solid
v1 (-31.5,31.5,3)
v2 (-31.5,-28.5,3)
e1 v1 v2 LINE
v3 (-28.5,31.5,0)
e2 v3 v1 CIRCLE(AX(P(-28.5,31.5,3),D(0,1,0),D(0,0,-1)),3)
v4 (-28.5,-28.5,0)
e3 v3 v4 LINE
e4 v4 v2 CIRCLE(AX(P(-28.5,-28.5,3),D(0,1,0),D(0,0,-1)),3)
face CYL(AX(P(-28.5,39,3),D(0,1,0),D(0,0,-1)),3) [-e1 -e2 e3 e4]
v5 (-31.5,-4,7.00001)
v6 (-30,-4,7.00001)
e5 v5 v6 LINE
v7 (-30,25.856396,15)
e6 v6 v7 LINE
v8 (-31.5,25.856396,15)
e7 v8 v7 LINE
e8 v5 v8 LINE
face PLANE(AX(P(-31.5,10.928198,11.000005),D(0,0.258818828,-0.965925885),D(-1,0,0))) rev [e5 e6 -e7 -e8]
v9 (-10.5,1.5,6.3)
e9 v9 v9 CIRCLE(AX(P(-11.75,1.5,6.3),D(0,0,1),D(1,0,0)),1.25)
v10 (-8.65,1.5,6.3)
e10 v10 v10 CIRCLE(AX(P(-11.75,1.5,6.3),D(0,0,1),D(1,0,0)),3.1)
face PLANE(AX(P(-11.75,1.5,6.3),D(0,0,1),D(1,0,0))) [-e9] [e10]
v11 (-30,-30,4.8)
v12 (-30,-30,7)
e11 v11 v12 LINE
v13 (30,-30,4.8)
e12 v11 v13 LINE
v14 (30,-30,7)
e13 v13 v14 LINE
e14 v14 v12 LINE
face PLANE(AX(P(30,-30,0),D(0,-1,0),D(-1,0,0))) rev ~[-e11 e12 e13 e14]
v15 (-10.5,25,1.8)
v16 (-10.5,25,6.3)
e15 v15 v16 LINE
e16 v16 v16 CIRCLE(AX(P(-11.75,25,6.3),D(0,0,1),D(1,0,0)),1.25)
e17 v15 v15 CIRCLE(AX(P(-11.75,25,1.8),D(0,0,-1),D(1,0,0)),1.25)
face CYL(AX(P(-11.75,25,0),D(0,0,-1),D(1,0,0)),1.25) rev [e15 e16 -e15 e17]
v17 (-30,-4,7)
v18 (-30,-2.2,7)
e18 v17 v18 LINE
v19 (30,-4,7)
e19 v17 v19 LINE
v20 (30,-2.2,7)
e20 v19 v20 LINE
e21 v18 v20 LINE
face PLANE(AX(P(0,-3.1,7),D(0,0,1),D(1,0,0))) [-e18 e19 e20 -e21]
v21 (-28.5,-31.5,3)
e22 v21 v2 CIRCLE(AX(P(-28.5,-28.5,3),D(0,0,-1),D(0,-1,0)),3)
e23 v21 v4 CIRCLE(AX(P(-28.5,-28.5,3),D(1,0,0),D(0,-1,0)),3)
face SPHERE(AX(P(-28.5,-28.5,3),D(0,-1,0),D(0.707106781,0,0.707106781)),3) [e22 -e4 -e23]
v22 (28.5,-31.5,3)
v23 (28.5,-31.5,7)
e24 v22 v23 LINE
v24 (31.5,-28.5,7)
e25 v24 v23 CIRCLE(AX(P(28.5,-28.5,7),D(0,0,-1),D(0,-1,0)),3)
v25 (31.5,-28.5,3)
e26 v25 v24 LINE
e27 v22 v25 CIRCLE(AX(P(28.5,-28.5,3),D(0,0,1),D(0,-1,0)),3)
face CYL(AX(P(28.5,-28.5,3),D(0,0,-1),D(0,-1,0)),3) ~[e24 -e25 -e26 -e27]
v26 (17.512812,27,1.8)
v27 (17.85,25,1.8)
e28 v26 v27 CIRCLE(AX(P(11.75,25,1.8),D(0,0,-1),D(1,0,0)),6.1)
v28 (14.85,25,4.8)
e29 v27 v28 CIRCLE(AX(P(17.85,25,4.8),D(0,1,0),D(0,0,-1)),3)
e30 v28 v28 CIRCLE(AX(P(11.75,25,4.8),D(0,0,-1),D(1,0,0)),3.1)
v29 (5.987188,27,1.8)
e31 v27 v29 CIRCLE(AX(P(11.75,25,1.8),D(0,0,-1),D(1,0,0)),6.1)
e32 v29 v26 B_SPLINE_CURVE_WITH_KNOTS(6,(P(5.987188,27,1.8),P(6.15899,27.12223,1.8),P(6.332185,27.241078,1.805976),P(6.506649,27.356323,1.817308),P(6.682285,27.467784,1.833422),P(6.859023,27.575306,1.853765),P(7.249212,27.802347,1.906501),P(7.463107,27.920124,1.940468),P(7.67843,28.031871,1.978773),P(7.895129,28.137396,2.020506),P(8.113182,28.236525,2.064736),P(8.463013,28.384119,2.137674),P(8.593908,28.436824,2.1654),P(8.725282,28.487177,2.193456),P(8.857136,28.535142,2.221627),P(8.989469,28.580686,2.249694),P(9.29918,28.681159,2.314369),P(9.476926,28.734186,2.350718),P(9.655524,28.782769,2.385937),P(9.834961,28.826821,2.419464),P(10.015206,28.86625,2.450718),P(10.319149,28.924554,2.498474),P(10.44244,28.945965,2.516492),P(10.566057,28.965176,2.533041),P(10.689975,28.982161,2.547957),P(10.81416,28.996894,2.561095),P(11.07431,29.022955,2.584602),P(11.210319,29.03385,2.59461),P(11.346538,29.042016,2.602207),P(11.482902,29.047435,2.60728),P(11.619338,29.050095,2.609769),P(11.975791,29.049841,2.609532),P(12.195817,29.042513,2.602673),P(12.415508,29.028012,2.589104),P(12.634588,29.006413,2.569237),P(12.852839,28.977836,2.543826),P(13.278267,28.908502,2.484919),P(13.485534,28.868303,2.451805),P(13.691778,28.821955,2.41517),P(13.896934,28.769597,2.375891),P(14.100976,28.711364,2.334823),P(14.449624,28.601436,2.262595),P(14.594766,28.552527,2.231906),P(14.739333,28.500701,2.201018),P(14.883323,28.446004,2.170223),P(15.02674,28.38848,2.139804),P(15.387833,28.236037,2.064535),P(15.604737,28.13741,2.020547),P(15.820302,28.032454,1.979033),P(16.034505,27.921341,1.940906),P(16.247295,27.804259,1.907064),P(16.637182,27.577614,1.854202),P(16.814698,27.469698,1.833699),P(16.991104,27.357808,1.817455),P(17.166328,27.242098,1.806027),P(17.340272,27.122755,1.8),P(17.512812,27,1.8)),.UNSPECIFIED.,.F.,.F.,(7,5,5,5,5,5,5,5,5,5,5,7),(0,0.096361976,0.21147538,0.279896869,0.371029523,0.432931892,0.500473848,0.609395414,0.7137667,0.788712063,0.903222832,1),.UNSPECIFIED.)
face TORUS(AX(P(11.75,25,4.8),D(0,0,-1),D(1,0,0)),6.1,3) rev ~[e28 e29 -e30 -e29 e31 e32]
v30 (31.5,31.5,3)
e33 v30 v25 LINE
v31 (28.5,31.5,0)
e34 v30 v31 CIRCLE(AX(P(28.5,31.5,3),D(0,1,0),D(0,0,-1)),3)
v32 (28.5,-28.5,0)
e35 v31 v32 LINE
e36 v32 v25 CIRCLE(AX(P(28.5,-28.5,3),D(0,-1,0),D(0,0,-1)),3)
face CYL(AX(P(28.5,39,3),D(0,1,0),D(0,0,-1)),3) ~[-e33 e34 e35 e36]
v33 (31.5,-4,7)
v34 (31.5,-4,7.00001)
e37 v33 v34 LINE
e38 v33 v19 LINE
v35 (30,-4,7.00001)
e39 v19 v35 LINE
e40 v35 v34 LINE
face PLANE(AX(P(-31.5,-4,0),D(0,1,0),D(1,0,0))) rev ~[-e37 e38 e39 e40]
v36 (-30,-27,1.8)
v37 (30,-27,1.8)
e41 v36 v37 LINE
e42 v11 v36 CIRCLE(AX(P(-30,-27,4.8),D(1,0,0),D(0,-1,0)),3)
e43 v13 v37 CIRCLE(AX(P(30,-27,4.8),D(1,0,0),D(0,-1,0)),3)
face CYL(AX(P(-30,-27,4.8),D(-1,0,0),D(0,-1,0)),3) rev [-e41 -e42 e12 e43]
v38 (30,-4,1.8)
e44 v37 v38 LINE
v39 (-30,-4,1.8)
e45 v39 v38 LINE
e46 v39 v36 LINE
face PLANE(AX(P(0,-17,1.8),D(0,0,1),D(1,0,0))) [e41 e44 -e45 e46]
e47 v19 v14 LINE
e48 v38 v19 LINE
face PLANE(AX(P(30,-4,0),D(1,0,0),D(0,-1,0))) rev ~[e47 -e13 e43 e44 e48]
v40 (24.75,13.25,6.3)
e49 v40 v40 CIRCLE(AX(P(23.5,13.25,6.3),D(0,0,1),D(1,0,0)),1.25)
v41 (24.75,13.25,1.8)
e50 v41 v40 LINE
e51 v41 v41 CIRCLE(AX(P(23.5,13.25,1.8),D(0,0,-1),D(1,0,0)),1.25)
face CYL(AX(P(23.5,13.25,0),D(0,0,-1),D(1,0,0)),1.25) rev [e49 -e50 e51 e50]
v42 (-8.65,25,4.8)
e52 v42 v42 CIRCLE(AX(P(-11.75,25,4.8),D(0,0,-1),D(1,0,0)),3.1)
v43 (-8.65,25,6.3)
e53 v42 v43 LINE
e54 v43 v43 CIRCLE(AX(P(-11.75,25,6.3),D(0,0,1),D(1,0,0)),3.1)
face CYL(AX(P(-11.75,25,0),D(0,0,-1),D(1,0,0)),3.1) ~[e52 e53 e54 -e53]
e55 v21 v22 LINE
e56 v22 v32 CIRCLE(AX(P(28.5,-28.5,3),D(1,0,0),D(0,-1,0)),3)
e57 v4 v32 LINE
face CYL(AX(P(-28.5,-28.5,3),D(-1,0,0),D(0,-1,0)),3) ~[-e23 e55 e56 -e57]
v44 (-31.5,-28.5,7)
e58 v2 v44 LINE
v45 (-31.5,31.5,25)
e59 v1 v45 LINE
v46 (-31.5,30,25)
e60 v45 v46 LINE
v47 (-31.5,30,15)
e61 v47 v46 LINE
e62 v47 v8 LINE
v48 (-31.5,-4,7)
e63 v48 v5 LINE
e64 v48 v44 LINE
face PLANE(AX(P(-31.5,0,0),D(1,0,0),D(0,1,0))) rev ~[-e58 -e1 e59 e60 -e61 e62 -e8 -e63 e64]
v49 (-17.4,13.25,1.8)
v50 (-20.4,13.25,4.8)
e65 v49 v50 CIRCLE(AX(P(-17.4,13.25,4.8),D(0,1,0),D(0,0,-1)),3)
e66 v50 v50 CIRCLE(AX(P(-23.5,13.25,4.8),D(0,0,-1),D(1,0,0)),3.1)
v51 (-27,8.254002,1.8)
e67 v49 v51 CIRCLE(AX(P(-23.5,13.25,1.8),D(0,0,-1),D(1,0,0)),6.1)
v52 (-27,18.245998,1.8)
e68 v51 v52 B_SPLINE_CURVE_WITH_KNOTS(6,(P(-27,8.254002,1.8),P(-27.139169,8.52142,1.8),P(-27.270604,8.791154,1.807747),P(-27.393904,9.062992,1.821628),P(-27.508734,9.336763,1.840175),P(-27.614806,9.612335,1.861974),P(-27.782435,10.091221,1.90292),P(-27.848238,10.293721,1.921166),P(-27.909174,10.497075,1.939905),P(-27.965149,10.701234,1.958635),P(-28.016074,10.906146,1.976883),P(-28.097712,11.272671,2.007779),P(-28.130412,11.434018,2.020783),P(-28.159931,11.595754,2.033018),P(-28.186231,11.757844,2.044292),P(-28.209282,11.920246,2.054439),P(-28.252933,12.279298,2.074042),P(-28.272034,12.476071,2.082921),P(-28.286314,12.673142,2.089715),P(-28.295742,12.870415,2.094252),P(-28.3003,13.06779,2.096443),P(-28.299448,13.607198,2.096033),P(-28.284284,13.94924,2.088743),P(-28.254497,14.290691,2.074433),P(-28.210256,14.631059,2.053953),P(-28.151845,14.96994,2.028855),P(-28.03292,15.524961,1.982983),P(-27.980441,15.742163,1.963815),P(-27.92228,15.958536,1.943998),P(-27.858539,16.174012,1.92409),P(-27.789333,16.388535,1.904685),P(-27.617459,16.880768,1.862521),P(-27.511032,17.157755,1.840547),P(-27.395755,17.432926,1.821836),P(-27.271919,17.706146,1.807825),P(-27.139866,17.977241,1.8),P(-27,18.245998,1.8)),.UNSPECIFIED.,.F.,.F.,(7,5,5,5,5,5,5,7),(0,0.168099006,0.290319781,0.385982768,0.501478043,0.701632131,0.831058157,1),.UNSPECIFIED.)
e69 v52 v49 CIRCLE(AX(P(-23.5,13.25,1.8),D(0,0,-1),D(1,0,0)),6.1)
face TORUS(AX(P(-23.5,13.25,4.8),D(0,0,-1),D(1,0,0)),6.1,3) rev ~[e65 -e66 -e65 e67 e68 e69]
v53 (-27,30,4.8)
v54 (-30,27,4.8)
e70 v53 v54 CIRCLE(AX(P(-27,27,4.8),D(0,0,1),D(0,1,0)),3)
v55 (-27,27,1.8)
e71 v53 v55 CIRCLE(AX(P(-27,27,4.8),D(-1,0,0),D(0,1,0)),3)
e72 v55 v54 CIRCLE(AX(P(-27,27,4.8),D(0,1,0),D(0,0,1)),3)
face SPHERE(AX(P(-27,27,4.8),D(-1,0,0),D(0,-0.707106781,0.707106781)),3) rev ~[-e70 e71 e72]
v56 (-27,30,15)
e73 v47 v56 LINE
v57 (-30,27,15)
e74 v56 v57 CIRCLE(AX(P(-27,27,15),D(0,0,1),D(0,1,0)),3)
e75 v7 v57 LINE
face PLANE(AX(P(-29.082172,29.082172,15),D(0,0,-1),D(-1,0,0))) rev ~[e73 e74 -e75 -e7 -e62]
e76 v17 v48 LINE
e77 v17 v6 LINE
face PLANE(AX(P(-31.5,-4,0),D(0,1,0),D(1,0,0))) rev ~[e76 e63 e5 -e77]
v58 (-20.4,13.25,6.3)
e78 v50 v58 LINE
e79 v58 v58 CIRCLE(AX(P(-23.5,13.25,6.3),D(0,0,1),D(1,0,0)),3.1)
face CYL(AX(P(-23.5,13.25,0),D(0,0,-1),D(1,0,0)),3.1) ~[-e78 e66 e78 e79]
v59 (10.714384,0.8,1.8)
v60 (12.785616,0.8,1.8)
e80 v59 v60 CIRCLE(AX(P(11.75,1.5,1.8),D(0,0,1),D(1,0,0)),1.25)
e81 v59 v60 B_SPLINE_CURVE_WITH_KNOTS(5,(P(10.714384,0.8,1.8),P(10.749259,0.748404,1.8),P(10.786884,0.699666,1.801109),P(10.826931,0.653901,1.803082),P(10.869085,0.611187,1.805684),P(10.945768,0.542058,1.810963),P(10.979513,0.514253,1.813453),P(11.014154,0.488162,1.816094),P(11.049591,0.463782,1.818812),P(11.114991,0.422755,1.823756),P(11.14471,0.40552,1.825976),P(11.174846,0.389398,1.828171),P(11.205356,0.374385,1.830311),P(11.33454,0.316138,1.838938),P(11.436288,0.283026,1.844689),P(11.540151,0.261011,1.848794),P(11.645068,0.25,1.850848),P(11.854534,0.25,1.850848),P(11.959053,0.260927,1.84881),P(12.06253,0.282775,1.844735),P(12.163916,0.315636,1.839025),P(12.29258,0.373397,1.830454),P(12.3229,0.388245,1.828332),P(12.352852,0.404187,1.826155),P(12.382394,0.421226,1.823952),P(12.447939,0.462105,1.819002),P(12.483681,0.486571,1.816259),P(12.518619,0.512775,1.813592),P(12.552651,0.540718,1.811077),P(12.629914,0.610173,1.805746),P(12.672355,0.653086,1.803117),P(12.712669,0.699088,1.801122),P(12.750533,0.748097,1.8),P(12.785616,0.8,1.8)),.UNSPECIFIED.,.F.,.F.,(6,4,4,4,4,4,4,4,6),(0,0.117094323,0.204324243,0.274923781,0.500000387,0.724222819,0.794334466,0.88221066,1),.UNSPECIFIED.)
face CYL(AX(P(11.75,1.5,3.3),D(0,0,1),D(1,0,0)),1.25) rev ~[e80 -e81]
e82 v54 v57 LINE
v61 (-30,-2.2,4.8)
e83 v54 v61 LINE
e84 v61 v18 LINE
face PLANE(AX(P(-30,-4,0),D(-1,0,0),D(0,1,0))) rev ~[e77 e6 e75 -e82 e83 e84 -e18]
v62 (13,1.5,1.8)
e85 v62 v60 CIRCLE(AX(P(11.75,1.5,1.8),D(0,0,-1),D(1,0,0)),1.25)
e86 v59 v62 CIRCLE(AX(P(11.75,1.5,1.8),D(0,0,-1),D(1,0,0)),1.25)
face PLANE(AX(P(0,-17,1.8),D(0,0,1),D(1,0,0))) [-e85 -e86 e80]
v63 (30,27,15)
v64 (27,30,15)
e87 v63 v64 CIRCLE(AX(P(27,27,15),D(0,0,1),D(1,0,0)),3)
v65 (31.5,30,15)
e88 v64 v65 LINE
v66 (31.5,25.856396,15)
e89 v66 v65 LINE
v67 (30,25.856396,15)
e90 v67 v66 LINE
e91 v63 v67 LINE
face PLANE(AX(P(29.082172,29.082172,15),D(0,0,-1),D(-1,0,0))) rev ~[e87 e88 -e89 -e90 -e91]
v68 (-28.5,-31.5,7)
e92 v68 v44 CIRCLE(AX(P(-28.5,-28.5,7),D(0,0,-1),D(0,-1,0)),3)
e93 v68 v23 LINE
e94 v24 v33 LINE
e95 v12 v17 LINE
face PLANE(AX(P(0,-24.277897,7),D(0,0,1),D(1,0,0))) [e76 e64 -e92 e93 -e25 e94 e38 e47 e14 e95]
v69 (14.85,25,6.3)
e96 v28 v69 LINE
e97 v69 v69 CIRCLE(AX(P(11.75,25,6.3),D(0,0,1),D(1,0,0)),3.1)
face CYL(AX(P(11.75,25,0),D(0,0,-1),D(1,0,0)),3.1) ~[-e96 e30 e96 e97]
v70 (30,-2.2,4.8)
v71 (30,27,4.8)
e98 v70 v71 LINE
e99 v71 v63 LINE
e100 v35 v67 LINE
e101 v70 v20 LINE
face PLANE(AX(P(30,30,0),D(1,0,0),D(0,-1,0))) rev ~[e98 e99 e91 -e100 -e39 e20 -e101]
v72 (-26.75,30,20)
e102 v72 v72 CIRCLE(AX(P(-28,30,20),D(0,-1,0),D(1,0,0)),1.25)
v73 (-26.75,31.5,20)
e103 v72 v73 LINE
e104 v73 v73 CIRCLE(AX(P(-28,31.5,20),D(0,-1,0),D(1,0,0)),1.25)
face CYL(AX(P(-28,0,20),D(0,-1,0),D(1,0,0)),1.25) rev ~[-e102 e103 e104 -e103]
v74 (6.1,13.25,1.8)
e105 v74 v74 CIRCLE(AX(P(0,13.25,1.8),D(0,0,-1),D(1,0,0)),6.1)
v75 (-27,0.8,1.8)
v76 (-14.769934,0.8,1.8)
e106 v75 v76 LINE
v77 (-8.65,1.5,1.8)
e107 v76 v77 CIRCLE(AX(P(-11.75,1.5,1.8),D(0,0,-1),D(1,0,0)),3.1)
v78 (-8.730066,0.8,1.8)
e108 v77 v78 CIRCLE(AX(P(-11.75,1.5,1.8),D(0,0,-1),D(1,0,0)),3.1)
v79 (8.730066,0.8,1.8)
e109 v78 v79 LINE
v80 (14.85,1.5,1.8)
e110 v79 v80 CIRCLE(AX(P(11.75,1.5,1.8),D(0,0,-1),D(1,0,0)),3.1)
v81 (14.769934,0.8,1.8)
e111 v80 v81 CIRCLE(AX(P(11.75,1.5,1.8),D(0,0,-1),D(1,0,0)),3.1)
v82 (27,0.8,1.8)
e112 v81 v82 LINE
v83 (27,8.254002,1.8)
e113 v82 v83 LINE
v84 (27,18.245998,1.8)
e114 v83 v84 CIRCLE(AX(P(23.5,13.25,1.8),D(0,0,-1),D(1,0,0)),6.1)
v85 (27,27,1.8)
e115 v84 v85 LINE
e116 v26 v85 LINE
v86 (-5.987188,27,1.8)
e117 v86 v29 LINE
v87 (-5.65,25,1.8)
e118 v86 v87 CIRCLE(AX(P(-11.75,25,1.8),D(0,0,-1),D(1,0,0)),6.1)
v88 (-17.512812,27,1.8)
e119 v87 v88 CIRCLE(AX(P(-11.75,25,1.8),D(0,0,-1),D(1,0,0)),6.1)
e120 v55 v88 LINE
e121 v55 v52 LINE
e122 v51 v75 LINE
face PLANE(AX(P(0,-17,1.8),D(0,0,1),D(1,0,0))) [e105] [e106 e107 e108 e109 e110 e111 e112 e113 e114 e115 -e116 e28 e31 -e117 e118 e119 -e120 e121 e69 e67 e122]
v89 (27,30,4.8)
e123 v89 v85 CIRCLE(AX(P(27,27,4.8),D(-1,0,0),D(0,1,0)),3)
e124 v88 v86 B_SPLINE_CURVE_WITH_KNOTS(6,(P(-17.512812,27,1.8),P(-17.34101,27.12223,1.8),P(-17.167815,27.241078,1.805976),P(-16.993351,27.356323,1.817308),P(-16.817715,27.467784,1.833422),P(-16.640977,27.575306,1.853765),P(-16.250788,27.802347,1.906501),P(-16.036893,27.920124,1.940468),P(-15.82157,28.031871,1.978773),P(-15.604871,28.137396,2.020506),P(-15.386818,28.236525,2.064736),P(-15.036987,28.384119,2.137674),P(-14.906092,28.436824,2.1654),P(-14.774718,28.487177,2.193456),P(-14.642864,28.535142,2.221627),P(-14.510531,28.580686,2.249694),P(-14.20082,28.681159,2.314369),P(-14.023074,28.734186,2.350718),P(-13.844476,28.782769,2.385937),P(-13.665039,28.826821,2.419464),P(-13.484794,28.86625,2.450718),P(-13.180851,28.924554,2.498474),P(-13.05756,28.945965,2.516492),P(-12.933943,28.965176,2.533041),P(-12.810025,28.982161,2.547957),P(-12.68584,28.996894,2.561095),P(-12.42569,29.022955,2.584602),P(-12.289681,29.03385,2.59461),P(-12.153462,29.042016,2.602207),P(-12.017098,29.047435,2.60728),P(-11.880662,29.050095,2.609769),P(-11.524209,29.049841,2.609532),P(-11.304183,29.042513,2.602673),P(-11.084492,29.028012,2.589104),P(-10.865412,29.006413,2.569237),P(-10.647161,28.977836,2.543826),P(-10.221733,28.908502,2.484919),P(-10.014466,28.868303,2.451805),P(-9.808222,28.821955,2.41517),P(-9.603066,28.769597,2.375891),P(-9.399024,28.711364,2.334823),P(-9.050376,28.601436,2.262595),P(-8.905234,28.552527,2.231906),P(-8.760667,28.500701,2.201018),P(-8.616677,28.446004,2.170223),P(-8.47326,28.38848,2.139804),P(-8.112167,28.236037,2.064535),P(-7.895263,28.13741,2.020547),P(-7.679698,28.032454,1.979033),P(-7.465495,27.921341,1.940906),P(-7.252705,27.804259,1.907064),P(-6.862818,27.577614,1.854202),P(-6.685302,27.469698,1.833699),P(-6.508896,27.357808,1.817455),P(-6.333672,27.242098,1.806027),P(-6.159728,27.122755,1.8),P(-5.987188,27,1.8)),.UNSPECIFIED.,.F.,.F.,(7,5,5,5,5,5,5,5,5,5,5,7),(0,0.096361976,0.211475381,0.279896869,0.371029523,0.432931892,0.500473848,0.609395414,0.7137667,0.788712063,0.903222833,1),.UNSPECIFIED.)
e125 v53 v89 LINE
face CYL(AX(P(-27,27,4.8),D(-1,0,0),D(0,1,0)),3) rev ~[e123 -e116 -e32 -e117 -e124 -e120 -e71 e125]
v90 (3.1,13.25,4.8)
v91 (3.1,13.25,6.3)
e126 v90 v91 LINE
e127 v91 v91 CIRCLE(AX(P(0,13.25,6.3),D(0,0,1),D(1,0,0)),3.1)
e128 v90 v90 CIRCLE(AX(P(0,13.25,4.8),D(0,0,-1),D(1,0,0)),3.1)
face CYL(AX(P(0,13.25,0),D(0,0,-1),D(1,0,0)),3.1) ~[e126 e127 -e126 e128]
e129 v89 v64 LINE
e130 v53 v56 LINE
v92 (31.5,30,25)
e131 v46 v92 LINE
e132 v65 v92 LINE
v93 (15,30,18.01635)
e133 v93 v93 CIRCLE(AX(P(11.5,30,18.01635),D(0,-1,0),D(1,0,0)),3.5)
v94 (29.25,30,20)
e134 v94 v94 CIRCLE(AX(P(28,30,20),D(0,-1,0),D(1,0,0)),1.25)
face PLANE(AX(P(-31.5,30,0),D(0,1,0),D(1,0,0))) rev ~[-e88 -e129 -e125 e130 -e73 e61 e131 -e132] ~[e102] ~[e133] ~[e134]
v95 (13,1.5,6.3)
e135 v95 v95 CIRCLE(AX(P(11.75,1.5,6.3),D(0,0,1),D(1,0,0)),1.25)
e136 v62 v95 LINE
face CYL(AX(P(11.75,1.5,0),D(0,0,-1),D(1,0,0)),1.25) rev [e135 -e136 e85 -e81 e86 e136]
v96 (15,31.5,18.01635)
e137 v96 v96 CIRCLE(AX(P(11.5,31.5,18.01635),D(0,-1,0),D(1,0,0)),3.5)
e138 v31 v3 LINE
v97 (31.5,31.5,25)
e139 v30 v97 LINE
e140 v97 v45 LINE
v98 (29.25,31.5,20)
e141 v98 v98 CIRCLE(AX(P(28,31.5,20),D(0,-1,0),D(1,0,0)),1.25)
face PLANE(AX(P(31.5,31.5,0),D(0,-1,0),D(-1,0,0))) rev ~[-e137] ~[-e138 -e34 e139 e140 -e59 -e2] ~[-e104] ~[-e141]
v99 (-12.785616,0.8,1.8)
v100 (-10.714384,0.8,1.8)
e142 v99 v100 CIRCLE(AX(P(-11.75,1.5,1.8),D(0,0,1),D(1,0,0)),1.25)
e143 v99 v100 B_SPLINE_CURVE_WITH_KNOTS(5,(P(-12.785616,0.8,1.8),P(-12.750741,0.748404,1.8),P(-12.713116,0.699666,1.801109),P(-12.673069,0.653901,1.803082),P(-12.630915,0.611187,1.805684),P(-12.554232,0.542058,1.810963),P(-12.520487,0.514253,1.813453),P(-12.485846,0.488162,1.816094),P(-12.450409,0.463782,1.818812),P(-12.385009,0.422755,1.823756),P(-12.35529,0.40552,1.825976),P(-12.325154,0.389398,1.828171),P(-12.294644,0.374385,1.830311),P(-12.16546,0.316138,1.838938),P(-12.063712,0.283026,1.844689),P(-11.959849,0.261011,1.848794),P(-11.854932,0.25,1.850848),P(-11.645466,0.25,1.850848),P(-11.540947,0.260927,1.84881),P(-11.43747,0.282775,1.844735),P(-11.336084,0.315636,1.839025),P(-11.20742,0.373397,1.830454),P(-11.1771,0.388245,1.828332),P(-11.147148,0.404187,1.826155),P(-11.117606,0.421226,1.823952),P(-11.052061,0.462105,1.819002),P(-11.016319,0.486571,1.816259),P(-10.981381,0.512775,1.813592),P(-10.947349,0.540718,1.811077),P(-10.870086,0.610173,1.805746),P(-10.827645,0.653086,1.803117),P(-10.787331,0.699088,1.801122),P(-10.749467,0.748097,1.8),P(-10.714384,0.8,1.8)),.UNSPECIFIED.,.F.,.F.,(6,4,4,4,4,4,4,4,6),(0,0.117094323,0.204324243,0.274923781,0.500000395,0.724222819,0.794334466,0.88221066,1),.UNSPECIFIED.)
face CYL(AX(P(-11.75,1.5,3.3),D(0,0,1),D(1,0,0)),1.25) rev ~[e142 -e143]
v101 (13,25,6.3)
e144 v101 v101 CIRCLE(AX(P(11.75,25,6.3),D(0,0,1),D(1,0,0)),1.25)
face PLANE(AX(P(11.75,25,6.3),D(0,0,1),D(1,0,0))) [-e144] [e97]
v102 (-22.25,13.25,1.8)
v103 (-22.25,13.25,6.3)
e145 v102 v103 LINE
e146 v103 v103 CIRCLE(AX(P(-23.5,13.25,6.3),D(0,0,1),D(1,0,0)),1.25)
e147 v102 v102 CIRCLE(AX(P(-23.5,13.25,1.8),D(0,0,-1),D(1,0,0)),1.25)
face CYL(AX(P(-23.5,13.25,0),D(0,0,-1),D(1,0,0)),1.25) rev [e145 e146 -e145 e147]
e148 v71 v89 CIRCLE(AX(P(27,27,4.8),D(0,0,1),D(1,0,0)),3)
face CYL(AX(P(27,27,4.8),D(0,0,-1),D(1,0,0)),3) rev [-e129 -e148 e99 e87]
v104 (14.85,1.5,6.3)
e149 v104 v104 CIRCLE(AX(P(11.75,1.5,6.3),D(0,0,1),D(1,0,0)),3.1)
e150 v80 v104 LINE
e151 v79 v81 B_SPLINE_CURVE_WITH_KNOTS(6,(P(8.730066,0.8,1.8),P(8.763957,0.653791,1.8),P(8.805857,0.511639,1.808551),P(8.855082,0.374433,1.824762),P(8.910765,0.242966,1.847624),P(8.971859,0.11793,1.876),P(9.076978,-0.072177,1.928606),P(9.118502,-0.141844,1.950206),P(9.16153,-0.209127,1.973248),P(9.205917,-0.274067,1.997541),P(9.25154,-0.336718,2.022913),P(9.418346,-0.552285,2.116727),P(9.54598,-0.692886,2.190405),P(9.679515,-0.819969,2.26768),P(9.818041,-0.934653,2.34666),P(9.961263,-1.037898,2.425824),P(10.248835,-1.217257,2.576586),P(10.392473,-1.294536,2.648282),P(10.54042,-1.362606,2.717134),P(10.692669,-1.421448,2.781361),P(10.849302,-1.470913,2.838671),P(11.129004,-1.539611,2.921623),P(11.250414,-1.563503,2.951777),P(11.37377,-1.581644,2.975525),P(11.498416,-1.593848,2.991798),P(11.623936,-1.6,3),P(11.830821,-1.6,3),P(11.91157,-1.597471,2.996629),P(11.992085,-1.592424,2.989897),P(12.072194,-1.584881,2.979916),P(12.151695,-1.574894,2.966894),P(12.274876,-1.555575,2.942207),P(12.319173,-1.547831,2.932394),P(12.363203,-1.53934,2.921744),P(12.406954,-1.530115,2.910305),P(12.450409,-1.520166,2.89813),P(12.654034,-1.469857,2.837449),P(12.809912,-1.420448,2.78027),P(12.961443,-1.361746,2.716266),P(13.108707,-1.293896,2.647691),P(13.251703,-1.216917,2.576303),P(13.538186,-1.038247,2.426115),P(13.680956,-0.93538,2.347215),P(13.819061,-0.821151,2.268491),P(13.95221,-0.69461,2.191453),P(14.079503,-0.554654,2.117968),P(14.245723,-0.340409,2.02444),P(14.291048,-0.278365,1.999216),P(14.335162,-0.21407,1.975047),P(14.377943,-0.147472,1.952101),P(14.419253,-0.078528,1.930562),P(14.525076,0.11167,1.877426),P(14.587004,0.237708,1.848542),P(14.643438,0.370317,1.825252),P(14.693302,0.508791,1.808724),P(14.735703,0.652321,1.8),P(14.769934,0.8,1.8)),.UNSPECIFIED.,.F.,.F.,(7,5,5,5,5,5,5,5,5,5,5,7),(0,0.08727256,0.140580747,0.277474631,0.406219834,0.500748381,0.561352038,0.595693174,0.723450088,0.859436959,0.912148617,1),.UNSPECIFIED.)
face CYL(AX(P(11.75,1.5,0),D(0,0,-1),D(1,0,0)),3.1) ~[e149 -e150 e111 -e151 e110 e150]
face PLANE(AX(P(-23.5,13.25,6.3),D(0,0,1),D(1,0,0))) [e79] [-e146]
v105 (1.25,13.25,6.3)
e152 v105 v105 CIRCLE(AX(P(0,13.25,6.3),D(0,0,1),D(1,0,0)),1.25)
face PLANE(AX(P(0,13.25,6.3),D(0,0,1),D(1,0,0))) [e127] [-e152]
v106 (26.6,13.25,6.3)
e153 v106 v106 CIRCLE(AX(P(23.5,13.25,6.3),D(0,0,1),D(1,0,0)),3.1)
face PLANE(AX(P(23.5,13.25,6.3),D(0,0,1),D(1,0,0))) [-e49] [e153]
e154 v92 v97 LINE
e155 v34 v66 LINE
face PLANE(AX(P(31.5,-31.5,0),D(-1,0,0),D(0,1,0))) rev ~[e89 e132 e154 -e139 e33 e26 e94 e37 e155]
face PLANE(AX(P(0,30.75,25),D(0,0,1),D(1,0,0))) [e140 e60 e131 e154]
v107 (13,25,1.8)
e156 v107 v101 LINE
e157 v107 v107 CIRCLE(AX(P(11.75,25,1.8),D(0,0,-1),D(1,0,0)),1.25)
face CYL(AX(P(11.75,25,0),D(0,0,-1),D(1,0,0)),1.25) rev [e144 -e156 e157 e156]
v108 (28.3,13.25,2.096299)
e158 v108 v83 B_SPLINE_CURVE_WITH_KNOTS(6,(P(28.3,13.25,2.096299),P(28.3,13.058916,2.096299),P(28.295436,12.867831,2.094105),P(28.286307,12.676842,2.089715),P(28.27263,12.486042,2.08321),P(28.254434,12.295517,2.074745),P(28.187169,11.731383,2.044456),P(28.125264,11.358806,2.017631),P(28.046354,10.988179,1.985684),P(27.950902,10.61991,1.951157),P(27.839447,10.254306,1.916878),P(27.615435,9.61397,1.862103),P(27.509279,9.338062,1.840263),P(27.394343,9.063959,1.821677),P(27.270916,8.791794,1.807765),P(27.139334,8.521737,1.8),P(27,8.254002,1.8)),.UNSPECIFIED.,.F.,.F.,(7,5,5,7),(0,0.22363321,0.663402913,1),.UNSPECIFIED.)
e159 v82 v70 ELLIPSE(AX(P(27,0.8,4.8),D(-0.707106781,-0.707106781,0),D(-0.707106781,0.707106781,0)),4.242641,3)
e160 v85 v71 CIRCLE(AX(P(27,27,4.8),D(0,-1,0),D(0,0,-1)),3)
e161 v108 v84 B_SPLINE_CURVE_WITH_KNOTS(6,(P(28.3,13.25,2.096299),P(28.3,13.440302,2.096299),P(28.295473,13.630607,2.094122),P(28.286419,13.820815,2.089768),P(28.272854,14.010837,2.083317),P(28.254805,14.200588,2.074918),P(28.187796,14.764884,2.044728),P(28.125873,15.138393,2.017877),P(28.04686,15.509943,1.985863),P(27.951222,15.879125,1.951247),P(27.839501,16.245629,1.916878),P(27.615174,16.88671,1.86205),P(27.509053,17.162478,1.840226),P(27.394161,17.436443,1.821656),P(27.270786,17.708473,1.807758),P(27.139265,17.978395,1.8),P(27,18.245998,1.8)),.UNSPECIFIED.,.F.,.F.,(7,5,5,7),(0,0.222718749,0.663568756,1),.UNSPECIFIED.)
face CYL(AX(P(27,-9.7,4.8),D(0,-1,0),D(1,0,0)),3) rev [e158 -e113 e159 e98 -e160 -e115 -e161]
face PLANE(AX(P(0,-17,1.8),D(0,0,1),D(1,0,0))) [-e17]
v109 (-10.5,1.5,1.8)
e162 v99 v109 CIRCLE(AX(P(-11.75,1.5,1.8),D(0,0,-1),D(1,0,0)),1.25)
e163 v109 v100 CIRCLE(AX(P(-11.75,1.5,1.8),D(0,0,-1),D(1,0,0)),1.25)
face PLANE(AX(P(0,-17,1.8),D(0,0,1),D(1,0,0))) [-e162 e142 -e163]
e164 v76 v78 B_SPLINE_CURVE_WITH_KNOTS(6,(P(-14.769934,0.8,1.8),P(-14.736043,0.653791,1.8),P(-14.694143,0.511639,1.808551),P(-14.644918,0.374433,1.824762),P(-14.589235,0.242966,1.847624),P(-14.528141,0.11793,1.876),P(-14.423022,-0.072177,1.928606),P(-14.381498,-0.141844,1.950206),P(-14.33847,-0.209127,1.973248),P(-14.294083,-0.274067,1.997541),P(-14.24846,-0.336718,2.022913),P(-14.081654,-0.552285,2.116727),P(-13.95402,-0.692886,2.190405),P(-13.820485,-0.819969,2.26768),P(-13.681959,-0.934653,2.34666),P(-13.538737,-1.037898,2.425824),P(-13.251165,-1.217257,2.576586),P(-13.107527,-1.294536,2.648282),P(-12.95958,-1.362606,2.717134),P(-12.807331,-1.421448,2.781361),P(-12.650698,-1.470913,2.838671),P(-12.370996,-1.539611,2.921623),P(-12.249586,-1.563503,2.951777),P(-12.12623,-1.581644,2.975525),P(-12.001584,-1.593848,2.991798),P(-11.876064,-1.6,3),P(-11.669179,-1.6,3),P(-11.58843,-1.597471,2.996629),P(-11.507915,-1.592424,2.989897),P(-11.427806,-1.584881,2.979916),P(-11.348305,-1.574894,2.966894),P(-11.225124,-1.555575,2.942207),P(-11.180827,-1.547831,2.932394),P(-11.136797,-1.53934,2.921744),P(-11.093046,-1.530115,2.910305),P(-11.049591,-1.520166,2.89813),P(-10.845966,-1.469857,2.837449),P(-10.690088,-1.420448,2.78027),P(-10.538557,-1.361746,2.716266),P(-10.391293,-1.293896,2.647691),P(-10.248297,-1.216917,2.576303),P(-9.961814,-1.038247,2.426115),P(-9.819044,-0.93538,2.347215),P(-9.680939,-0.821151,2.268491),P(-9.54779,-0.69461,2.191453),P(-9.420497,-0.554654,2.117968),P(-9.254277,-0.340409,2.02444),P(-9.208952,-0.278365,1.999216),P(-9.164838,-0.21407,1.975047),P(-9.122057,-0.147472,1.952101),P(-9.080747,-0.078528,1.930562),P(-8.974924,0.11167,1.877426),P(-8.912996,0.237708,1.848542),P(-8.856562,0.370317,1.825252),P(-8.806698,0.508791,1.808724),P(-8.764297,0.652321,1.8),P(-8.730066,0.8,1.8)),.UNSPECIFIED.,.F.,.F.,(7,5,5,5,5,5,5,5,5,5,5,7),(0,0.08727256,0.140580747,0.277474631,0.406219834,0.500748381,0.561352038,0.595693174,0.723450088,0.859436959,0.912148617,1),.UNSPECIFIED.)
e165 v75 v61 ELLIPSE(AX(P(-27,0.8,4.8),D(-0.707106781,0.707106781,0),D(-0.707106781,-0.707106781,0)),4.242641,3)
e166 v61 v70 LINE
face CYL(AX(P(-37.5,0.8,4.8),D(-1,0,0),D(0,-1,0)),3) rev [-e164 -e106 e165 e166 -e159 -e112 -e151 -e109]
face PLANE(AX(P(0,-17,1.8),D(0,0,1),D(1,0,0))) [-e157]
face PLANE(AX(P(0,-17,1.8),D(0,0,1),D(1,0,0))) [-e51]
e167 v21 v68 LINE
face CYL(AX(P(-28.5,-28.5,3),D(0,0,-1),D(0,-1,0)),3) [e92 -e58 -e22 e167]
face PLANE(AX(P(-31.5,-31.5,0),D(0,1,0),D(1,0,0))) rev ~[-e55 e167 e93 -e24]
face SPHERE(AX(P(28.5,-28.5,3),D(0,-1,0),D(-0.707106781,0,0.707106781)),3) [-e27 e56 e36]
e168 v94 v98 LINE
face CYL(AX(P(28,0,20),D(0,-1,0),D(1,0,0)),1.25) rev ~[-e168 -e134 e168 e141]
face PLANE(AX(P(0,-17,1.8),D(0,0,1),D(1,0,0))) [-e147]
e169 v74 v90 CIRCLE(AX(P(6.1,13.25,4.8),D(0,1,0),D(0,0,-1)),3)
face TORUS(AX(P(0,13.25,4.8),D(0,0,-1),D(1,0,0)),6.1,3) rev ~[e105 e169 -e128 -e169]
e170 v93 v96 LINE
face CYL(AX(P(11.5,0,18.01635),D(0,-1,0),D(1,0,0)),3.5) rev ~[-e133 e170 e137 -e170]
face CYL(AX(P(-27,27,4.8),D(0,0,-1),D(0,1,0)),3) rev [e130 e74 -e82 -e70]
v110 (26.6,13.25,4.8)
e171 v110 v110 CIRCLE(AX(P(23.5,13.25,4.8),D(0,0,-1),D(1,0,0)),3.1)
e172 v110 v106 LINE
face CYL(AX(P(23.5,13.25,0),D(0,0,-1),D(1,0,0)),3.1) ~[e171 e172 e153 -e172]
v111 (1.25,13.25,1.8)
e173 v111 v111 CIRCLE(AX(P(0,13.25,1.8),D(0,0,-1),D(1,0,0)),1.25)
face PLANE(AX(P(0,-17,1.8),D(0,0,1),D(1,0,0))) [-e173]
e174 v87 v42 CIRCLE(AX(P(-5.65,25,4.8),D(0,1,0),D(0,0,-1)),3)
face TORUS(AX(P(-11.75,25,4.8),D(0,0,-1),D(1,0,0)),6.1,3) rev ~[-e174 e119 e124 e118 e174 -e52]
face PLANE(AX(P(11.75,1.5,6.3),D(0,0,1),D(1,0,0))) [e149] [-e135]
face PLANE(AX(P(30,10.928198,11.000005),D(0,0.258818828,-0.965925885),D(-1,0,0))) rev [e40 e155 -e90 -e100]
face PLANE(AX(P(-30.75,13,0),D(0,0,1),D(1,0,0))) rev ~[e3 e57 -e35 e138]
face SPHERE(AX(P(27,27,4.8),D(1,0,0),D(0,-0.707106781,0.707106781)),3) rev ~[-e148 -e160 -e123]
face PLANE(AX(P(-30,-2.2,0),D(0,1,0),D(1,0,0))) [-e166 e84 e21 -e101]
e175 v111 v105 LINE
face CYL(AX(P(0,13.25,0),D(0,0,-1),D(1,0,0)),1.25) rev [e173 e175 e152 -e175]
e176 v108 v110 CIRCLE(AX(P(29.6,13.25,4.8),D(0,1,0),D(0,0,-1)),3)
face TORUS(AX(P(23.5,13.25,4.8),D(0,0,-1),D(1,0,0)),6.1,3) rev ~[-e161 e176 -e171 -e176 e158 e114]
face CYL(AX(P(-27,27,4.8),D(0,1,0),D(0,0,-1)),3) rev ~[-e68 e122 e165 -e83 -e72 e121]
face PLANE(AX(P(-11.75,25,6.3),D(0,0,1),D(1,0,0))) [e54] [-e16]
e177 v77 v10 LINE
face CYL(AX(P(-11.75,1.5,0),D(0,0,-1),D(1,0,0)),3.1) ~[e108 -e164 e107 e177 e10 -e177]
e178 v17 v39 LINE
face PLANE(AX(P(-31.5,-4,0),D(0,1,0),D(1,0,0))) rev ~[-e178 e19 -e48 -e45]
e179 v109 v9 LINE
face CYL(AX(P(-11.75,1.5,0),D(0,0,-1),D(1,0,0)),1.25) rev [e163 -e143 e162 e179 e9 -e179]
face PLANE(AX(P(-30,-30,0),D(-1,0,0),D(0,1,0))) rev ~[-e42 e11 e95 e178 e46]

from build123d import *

# Parameters (mm, degrees)
F1_DEPTH      = 25
F0_W          = 60
F0_H          = 26
F0_H_2        = 32.2
F0_H_3        = 1.8
F2_DEPTH      = 1.8
F3_DEPTH      = 7
F4_R          = 3.1
F4_R_2        = 1.25
F5_DEPTH      = 6.3
F6_DEPTH      = 15
F7_DEPTH      = 7
F8_SIZE2      = 29.856396
F8_SIZE       = 7.99999
F9_SIZE2      = 29.856396
F9_SIZE       = 7.99999
F10_R         = 1.25
F10_R_2       = 3.5
F11_DEPTH     = 31.501
F12_T1_DEPTH  = 54
F12_T3_DEPTH  = 60
F12_T5_DEPTH  = 10.2
F12_S9_W      = 3.06
F12_S9_H      = 3.06
F12_T10_DEPTH = 3.06
F12_S15_W     = 3.06
F12_S15_H     = 3.06
F12_T16_DEPTH = 3.06
F12_T32_DEPTH = 75
F12_S35_R     = 1.25
F12_T36_DEPTH = 39
F12_S37_R     = 1.25
F12_T38_DEPTH = 39
F12_T42_DEPTH = 36.7
F12_T47_DEPTH = 36.7
F12_T49_DEPTH = 11.5
F12_T51_DEPTH = 57
F12_T53_DEPTH = 67.5
F12_S57_W     = 3.06
F12_S57_H     = 3.06
F12_T58_DEPTH = 3.06
F12_S63_W     = 3.06
F12_S63_H     = 3.06
F12_T64_DEPTH = 3.06


# Not quite as in the source:
# - a fillet or chamfer that OpenCascade refuses, or shapes differently, is made with other operations: its cross-section is extruded or revolved along the edge and cut away or added
# - a fillet or chamfer is up to 0.001 mm smaller than in the source, because OpenCascade refuses the exact size


with BuildPart() as f1:
    # F0 (on Top) → F1 (new body)
    with BuildSketch(Plane.XY):
        Polygon((-30, 30), (30, 30), (31.5, 30), (31.5, 31.5), (0, 31.5), (-31.5, 31.5), (-31.5, 30), align=None)
    extrude(amount=F1_DEPTH)

    # F0 (on Top) → F2 (join)
    with BuildSketch(Plane.XY):
        with Locations((0, -17)):
            Rectangle(F0_W, F0_H)
        Polygon((30, -4), (30, -30), (-30, -30), (-30, -4), (-31.5, -4), (-31.5, -5), (-31.5, -31.5), (-4.0078373849, -31.5), (31.5, -31.5), (31.5, -4), align=None)
        with Locations((0, 13.9)):
            Rectangle(F0_W, F0_H_2)
        with Locations((0, -3.1)):
            Rectangle(F0_W, F0_H_3)
    extrude(amount=F2_DEPTH)

    # F0 (on Top) → F3 (join)
    with BuildSketch(Plane.XY):
        with Locations((0, -3.1)):
            Rectangle(F0_W, F0_H_3)
    extrude(amount=F3_DEPTH)

    # F4 (on Top) → F5 (join)
    with BuildSketch(Plane.XY):
        with Locations((23.5, 13.25)):
            Circle(F4_R)
        with Locations((23.5, 13.25)):
            Circle(F4_R_2, mode=Mode.SUBTRACT)
        with Locations((11.75, 1.5)):
            Circle(F4_R)
        with Locations((11.75, 1.5)):
            Circle(F4_R_2, mode=Mode.SUBTRACT)
        with Locations((11.75, 25)):
            Circle(F4_R)
        with Locations((11.75, 25)):
            Circle(F4_R_2, mode=Mode.SUBTRACT)
        with Locations((0, 13.25)):
            Circle(F4_R)
        with Locations((0, 13.25)):
            Circle(F4_R_2, mode=Mode.SUBTRACT)
        with Locations((-11.75, 25)):
            Circle(F4_R)
        with Locations((-11.75, 25)):
            Circle(F4_R_2, mode=Mode.SUBTRACT)
        with Locations((-11.75, 1.5)):
            Circle(F4_R)
        with Locations((-11.75, 1.5)):
            Circle(F4_R_2, mode=Mode.SUBTRACT)
        with Locations((-23.5, 13.25)):
            Circle(F4_R)
        with Locations((-23.5, 13.25)):
            Circle(F4_R_2, mode=Mode.SUBTRACT)
    extrude(amount=F5_DEPTH)

    # F0 (on Top) → F6 (join)
    with BuildSketch(Plane.XY):
        Polygon((-31.5, -4), (-30, -4), (-30, -2.2), (-30, 30), (-31.5, 30), (-31.5, 5), align=None)
        Polygon((30, -2.2), (30, -4), (31.5, -4), (31.5, 30), (30, 30), align=None)
    extrude(amount=F6_DEPTH)

    # F0 (on Top) → F7 (join)
    with BuildSketch(Plane.XY):
        Polygon((30, -4), (30, -30), (-30, -30), (-30, -4), (-31.5, -4), (-31.5, -5), (-31.5, -31.5), (-4.0078373849, -31.5), (31.5, -31.5), (31.5, -4), align=None)
    extrude(amount=F7_DEPTH)

    # F8 (size 8 and 29.8564064606 in the source; OpenCascade refuses exactly that, so slightly less here)
    f8_edges = [f1.edges().sort_by_distance(p)[0] for p in [
        (-30.75, -4, 15),
    ]]
    f8_side = f1.faces().sort_by_distance((-30.75, -4, 11))[0]
    chamfer(f8_edges, length=F8_SIZE, length2=F8_SIZE2, reference=f8_side)

    # F9 (size 8 and 29.8564064606 in the source; OpenCascade refuses exactly that, so slightly less here)
    f9_edges = [f1.edges().sort_by_distance(p)[0] for p in [
        (30.75, -4, 15),
    ]]
    f9_side = f1.faces().sort_by_distance((30.75, -4, 11))[0]
    chamfer(f9_edges, length=F9_SIZE, length2=F9_SIZE2, reference=f9_side)

    # F10 (on Front) → F11 (cut, through all)
    with BuildSketch(Plane.XZ):
        with Locations((28, 20)):
            Circle(F10_R)
        with Locations((-28, 20)):
            Circle(F10_R)
        with Locations((11.5, 18.0163495243)):
            Circle(F10_R_2)
    extrude(amount=-F11_DEPTH, mode=Mode.SUBTRACT)

    # F12: fillet of radius 3 on 17 edges, made by hand

    # F12_s2 → F12_t1 (join)
    with BuildSketch(Plane.YZ.offset(-27)):
        with BuildLine():
            ThreePointArc((30, 4.8), (29.1213203436, 2.6786796564), (27, 1.8))
            Line((27, 1.8), (30, 1.8))
            Line((30, 1.8), (30, 4.8))
        make_face()
    extrude(amount=F12_T1_DEPTH)

    # F12_s4 → F12_t3 (join)
    with BuildSketch(Plane.YZ.offset(-30)):
        with BuildLine():
            ThreePointArc((-30, 4.8), (-29.1213203436, 2.6786796564), (-27, 1.8))
            Line((-27, 1.8), (-30, 1.8))
            Line((-30, 1.8), (-30, 4.8))
        make_face()
    extrude(amount=F12_T3_DEPTH)

    # F12_s6 → F12_t5 (join)
    with BuildSketch(Plane.XY.offset(4.8)):
        with BuildLine():
            ThreePointArc((30, 27), (29.1213203436, 29.1213203436), (27, 30))
            Line((27, 30), (30, 30))
            Line((30, 30), (30, 27))
        make_face()
        with BuildLine():
            ThreePointArc((-27, 30), (-29.1213203436, 29.1213203436), (-30, 27))
            Line((-30, 27), (-30, 30))
            Line((-30, 30), (-27, 30))
        make_face()
    extrude(amount=F12_T5_DEPTH)


with BuildPart() as f12_tool8:
    # F12_s9 → F12_t10 (new body)
    with BuildSketch(Plane.YZ.offset(27)):
        with Locations((28.53, 3.27)):
            Rectangle(F12_S9_W, F12_S9_H)
    extrude(amount=F12_T10_DEPTH)

    # F12_s11 → F12_t12 (revolve, cut)
    with BuildSketch(Plane(origin=(27, 27, 4.8), x_dir=(0, -0.7071067812, 0.7071067812), z_dir=(0, 0.7071067812, 0.7071067812))):
        with BuildLine():
            ThreePointArc((0, -3), (3, 0), (0, 3))
            Line((0, 3), (0, -3))
        make_face()
    revolve(axis=Axis((27, 27, 4.8), (1, 0, 0)), mode=Mode.SUBTRACT)


with BuildPart() as f1_1:
    add(f1.part)

    # F12_t7: union F12_tool8
    add(f12_tool8.part)


with BuildPart() as f12_tool14:
    # F12_s15 → F12_t16 (new body)
    with BuildSketch(Plane.YZ.offset(-27)):
        with Locations((28.53, 3.27)):
            Rectangle(F12_S15_W, F12_S15_H)
    extrude(amount=-F12_T16_DEPTH)

    # F12_s17 → F12_t18 (revolve, cut)
    with BuildSketch(Plane(origin=(-27, 27, 4.8), x_dir=(0, -0.7071067812, 0.7071067812), z_dir=(0, -0.7071067812, -0.7071067812))):
        with BuildLine():
            ThreePointArc((0, -3), (3, 0), (0, 3))
            Line((0, 3), (0, -3))
        make_face()
    revolve(axis=Axis((-27, 27, 4.8), (-1, 0, 0)), mode=Mode.SUBTRACT)


with BuildPart() as f1_2:
    add(f1_1.part)

    # F12_t13: union F12_tool14
    add(f12_tool14.part)

    # F12_s19 → F12_t20 (revolve)
    with BuildSketch(Plane.XZ.offset(-25)):
        with BuildLine():
            ThreePointArc((-5.65, 1.8), (-7.7713203436, 2.6786796564), (-8.65, 4.8))
            Line((-8.65, 4.8), (-8.65, 1.8))
            Line((-8.65, 1.8), (-5.65, 1.8))
        make_face()
    revolve(axis=Axis((-11.75, 25, 1.8), (0, 0, -1)))

    # F12_s21 → F12_t22 (revolve)
    with BuildSketch(Plane.XZ.offset(-13.25)):
        with BuildLine():
            ThreePointArc((-17.4, 1.8), (-19.5213203436, 2.6786796564), (-20.4, 4.8))
            Line((-20.4, 4.8), (-20.4, 1.8))
            Line((-20.4, 1.8), (-17.4, 1.8))
        make_face()
    revolve(axis=Axis((-23.5, 13.25, 1.8), (0, 0, -1)))

    # F12_s23 → F12_t24 (revolve)
    with BuildSketch(Plane.XZ.offset(-13.25)):
        with BuildLine():
            ThreePointArc((6.1, 1.8), (3.9786796564, 2.6786796564), (3.1, 4.8))
            Line((3.1, 4.8), (3.1, 1.8))
            Line((3.1, 1.8), (6.1, 1.8))
        make_face()
    revolve(axis=Axis((0, 13.25, 1.8), (0, 0, -1)))

    # F12_s25 → F12_t26 (revolve)
    with BuildSketch(Plane.XZ.offset(-25)):
        with BuildLine():
            ThreePointArc((17.85, 1.8), (15.7286796564, 2.6786796564), (14.85, 4.8))
            Line((14.85, 4.8), (14.85, 1.8))
            Line((14.85, 1.8), (17.85, 1.8))
        make_face()
    revolve(axis=Axis((11.75, 25, 1.8), (0, 0, -1)))

    # F12_s27 → F12_t28 (revolve)
    with BuildSketch(Plane.XZ.offset(-13.25)):
        with BuildLine():
            ThreePointArc((29.6, 1.8), (27.4786796564, 2.6786796564), (26.6, 4.8))
            Line((26.6, 4.8), (26.6, 1.8))
            Line((26.6, 1.8), (29.6, 1.8))
        make_face()
    revolve(axis=Axis((23.5, 13.25, 1.8), (0, 0, -1)))


with BuildPart() as f12_tool30:
    # F12_s31 → F12_t32 (new body)
    with BuildSketch(Plane.YZ.offset(-37.5)):
        with BuildLine():
            ThreePointArc((-2.2, 4.8), (-1.3213203436, 2.6786796564), (0.8, 1.8))
            Line((0.8, 1.8), (-2.2, 1.8))
            Line((-2.2, 1.8), (-2.2, 4.8))
        make_face()
    extrude(amount=F12_T32_DEPTH)

    split(bisect_by=Plane.YZ.offset(31.5), keep=Keep.BOTTOM)

    split(bisect_by=Plane.YZ.offset(-31.5), keep=Keep.TOP)

    # F12_s35 → F12_t36 (cut, symmetric)
    with BuildSketch(Plane.XY.offset(3.3)):
        with Locations((-11.75, 1.5)):
            Circle(F12_S35_R)
    extrude(amount=F12_T36_DEPTH, both=True, mode=Mode.SUBTRACT)

    # F12_s37 → F12_t38 (cut, symmetric)
    with BuildSketch(Plane.XY.offset(3.3)):
        with Locations((11.75, 1.5)):
            Circle(F12_S37_R)
    extrude(amount=F12_T38_DEPTH, both=True, mode=Mode.SUBTRACT)


with BuildPart() as f1_3:
    add(f1_2.part)

    # F12_t29: union F12_tool30
    add(f12_tool30.part)


with BuildPart() as f12_tool40:
    # F12_s41 → F12_t42 (new body)
    with BuildSketch(Plane.XZ.offset(-27)):
        with BuildLine():
            ThreePointArc((-27, 1.8), (-29.1213203436, 2.6786796564), (-30, 4.8))
            Line((-30, 4.8), (-30, 1.8))
            Line((-30, 1.8), (-27, 1.8))
        make_face()
    extrude(amount=F12_T42_DEPTH)

    split(bisect_by=Plane.XZ.offset(4), keep=Keep.BOTTOM)


with BuildPart() as f1_4:
    add(f1_3.part)

    # F12_t39: union F12_tool40
    add(f12_tool40.part)


with BuildPart() as f12_tool45:
    # F12_s46 → F12_t47 (new body)
    with BuildSketch(Plane.XZ.offset(9.7)):
        with BuildLine():
            ThreePointArc((30, 4.8), (29.1213203436, 2.6786796564), (27, 1.8))
            Line((27, 1.8), (30, 1.8))
            Line((30, 1.8), (30, 4.8))
        make_face()
    extrude(amount=-F12_T47_DEPTH)

    split(bisect_by=Plane.XZ.offset(4), keep=Keep.BOTTOM)


with BuildPart() as f1_5:
    add(f1_4.part)

    # F12_t44: union F12_tool45
    add(f12_tool45.part)

    # F12_s50 → F12_t49 (cut)
    with BuildSketch(Plane.XY.offset(3)):
        with BuildLine():
            ThreePointArc((-28.5, -31.5), (-30.6213203436, -30.6213203436), (-31.5, -28.5))
            Line((-31.5, -28.5), (-31.5, -31.5))
            Line((-31.5, -31.5), (-28.5, -31.5))
        make_face()
        with BuildLine():
            ThreePointArc((28.5, -31.5), (30.6213203436, -30.6213203436), (31.5, -28.5))
            Line((31.5, -28.5), (31.5, -31.5))
            Line((31.5, -31.5), (28.5, -31.5))
        make_face()
    extrude(amount=F12_T49_DEPTH, mode=Mode.SUBTRACT)

    # F12_s52 → F12_t51 (cut)
    with BuildSketch(Plane.YZ.offset(-28.5)):
        with BuildLine():
            ThreePointArc((-31.5, 3), (-30.6213203436, 0.8786796564), (-28.5, 0))
            Line((-28.5, 0), (-31.5, 0))
            Line((-31.5, 0), (-31.5, 3))
        make_face()
    extrude(amount=F12_T51_DEPTH, mode=Mode.SUBTRACT)

    # F12_s54 → F12_t53 (cut)
    with BuildSketch(Plane.XZ.offset(-39)):
        with BuildLine():
            ThreePointArc((28.5, 0), (30.6213203436, 0.8786796564), (31.5, 3))
            Line((31.5, 3), (31.5, 0))
            Line((31.5, 0), (28.5, 0))
        make_face()
        with BuildLine():
            ThreePointArc((-28.5, 0), (-30.6213203436, 0.8786796564), (-31.5, 3))
            Line((-31.5, 3), (-31.5, 0))
            Line((-31.5, 0), (-28.5, 0))
        make_face()
    extrude(amount=F12_T53_DEPTH, mode=Mode.SUBTRACT)


with BuildPart() as f12_tool56:
    # F12_s57 → F12_t58 (new body)
    with BuildSketch(Plane.XZ.offset(28.5)):
        with Locations((-30.03, 1.47)):
            Rectangle(F12_S57_W, F12_S57_H)
    extrude(amount=F12_T58_DEPTH)

    # F12_s59 → F12_t60 (revolve, cut)
    with BuildSketch(Plane(origin=(-28.5, -28.5, 3), x_dir=(0.7071067812, 0, 0.7071067812), z_dir=(0.7071067812, 0, -0.7071067812))):
        with BuildLine():
            ThreePointArc((0, -3), (3, 0), (0, 3))
            Line((0, 3), (0, -3))
        make_face()
    revolve(axis=Axis((-28.5, -28.5, 3), (0, -1, 0)), mode=Mode.SUBTRACT)


with BuildPart() as f1_6:
    add(f1_5.part)

    # F12_t55: cut F12_tool56
    add(f12_tool56.part, mode=Mode.SUBTRACT)


with BuildPart() as f12_tool62:
    # F12_s63 → F12_t64 (new body)
    with BuildSketch(Plane.XZ.offset(28.5)):
        with Locations((30.03, 1.47)):
            Rectangle(F12_S63_W, F12_S63_H)
    extrude(amount=F12_T64_DEPTH)

    # F12_s65 → F12_t66 (revolve, cut)
    with BuildSketch(Plane(origin=(28.5, -28.5, 3), x_dir=(-0.7071067812, 0, 0.7071067812), z_dir=(0.7071067812, 0, 0.7071067812))):
        with BuildLine():
            ThreePointArc((0, -3), (3, 0), (0, 3))
            Line((0, 3), (0, -3))
        make_face()
    revolve(axis=Axis((28.5, -28.5, 3), (0, -1, 0)), mode=Mode.SUBTRACT)


with BuildPart() as f1_7:
    add(f1_6.part)

    # F12_t61: cut F12_tool62
    add(f12_tool62.part, mode=Mode.SUBTRACT)


solid = f1_7.part
